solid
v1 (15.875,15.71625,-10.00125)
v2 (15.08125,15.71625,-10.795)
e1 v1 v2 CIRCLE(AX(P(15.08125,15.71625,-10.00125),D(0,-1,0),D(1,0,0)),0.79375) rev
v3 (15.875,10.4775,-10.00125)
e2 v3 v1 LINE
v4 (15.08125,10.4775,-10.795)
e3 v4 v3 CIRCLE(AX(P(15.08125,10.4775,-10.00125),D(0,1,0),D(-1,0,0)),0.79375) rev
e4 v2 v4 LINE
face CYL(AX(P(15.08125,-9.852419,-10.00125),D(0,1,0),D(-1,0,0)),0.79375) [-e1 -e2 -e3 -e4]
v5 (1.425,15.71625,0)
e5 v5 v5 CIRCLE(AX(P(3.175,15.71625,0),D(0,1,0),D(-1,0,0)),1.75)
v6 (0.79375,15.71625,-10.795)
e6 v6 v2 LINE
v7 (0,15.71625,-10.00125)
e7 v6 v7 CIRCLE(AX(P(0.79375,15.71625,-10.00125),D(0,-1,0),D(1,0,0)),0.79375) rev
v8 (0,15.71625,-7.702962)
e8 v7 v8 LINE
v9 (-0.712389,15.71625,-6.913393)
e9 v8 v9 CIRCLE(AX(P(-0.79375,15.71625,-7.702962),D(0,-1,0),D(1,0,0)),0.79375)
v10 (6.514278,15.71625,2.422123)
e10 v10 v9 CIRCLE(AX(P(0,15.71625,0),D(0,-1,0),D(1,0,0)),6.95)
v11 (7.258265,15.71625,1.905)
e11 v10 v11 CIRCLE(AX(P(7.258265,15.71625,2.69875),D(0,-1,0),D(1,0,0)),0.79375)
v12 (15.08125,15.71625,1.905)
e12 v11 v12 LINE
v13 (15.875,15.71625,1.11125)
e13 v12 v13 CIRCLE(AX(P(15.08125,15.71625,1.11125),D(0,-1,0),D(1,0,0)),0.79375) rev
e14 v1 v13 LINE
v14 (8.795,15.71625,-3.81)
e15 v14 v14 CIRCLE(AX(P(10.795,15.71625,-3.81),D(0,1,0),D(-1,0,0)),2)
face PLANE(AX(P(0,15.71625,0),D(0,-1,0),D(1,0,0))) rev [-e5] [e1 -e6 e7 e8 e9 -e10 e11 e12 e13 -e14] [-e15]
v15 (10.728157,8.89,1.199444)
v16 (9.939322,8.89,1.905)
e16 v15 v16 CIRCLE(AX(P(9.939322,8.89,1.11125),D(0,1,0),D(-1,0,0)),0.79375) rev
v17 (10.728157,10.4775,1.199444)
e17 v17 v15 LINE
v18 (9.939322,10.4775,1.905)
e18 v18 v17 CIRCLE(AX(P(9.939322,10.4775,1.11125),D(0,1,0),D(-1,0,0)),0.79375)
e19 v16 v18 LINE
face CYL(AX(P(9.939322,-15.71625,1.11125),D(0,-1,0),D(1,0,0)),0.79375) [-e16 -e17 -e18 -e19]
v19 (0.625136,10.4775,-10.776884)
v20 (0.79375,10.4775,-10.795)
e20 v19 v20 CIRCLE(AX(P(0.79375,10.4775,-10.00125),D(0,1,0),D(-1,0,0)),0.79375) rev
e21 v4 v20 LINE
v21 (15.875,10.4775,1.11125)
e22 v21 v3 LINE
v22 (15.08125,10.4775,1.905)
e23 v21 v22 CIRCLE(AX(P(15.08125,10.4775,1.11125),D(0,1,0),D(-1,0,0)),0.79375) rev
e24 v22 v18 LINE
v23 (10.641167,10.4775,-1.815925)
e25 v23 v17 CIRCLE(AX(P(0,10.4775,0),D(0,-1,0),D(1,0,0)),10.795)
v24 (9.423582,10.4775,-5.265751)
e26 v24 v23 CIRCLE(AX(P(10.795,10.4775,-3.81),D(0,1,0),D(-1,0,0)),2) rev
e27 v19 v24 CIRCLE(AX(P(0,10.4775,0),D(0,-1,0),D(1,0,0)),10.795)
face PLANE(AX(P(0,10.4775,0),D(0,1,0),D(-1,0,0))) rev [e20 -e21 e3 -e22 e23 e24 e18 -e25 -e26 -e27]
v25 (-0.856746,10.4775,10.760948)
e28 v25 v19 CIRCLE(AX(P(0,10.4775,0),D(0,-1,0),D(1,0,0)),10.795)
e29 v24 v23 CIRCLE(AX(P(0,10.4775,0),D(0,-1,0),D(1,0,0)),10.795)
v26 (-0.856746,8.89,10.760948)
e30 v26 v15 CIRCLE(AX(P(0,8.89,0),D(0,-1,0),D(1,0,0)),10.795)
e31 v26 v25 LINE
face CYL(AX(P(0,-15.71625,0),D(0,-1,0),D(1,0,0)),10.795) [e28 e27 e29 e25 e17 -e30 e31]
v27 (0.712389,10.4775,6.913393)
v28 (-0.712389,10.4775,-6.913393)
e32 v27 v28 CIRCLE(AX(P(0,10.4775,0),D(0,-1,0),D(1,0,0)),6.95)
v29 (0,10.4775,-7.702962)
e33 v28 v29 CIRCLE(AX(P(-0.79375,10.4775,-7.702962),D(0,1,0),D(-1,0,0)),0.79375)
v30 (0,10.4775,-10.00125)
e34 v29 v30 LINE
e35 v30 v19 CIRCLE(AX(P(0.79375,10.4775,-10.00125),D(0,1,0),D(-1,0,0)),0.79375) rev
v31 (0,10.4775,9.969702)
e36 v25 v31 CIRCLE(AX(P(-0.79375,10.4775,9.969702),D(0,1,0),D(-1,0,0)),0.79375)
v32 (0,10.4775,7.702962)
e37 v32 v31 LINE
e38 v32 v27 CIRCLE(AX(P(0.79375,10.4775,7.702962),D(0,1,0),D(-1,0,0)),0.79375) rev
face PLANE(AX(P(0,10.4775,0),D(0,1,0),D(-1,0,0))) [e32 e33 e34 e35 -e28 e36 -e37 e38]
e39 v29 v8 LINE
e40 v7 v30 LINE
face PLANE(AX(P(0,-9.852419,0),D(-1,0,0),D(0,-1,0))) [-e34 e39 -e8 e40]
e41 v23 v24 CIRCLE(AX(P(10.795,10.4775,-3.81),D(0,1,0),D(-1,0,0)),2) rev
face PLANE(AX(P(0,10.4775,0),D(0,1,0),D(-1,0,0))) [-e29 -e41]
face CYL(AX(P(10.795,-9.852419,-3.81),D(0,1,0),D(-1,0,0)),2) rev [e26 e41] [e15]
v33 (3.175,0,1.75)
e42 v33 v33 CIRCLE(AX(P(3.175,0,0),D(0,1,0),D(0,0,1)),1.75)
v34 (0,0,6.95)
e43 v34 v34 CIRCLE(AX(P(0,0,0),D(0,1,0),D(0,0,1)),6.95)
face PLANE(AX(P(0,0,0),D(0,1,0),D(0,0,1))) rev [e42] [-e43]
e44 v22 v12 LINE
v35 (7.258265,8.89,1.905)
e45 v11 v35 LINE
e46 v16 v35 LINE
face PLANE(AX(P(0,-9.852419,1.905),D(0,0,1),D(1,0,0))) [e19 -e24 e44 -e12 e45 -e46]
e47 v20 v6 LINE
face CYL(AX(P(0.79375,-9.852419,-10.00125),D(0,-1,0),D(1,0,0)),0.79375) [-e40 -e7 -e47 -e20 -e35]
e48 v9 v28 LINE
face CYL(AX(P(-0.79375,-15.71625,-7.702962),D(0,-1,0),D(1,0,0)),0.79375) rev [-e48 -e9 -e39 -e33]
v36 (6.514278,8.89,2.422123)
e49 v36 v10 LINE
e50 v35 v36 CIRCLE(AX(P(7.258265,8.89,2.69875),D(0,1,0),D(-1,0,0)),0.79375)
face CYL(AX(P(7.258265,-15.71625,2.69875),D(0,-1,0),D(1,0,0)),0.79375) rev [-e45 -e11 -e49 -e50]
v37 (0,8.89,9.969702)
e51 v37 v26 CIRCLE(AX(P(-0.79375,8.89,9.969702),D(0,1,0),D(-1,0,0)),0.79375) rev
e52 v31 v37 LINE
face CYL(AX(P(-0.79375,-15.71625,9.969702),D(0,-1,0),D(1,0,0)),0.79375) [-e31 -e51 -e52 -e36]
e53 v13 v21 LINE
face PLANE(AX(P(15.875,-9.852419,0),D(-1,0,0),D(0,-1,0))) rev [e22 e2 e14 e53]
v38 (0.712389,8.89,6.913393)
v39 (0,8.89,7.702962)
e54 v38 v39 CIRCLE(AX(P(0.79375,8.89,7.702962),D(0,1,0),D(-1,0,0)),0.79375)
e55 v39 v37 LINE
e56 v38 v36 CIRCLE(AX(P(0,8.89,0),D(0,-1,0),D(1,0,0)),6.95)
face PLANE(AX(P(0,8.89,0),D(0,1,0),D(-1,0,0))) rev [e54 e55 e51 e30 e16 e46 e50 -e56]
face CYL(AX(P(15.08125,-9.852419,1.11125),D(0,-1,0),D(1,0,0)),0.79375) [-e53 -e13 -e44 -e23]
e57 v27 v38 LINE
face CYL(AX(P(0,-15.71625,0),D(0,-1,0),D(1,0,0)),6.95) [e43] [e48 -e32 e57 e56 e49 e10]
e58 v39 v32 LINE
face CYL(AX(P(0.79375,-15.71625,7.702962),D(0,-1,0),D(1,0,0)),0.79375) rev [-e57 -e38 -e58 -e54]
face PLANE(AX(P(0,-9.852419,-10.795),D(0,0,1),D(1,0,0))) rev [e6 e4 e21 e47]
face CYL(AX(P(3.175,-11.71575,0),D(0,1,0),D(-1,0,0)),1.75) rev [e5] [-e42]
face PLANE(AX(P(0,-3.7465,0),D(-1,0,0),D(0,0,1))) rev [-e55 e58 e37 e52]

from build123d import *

# Parameters (mm, degrees)
SKETCH2_W           = 5.23875
SKETCH2_H           = 6.95
SKETCH2_W_2         = 1.5875
SKETCH2_H_2         = 3.845
SKETCH2_W_3         = 17.78
SKETCH3_R           = 11.338051479
CUT_EXTRUDE1_DEPTH  = 21.336
SKETCH5_R           = 1.75
CUT_EXTRUDE3_DEPTH  = 27.432
BOSS_EXTRUDE2_START = -5.23875
SKETCH5_3_R         = 2
BOSS_EXTRUDE2_DEPTH = 5.23875
FILLET1_R           = 0.79375
CUT_EXTRUDE4_START  = -14.224
CUT_EXTRUDE4_DEPTH  = 14.224
FILLET2_R           = 0.79375


with BuildPart() as part:
    # Sketch2 → Revolve2 (revolve)
    with BuildSketch(Plane(origin=(0, 0, 0), x_dir=(0, 1, 0), z_dir=(0, 0, 1)), mode=Mode.PRIVATE) as revolve2_sk:
        with Locations((-13.096875, 3.475)):
            Rectangle(SKETCH2_W, SKETCH2_H)
        with Locations((-9.68375, 3.475)):
            Rectangle(SKETCH2_W_2, SKETCH2_H)
        with Locations((-9.68375, 8.8725)):
            Rectangle(SKETCH2_W_2, SKETCH2_H_2)
        with Locations((0, 3.475)):
            Rectangle(SKETCH2_W_3, SKETCH2_H)
        with Locations((9.68375, 3.475)):
            Rectangle(SKETCH2_W_2, SKETCH2_H)
        with Locations((9.68375, 8.8725)):
            Rectangle(SKETCH2_W_2, SKETCH2_H_2)
        with Locations((13.096875, 3.475)):
            Rectangle(SKETCH2_W, SKETCH2_H)
    revolve(revolve2_sk.sketch.rotate(Axis((0, -15.71625, 0), (0, 1, 0)), 180), axis=Axis((0, -15.71625, 0), (0, 1, 0)))

    # Sketch3 → Cut-Extrude1 (cut)
    with BuildSketch(Plane(origin=(0, 0, 0), x_dir=(-1, 0, 0), z_dir=(0, 1, 0))):
        Circle(SKETCH3_R)
    extrude(amount=-CUT_EXTRUDE1_DEPTH, mode=Mode.SUBTRACT)

    # Sketch5 → Cut-Extrude3 (cut)
    with BuildSketch(Plane(origin=(0, 15.71625, 0), x_dir=(-1, 0, 0), z_dir=(0, 1, 0))):
        with Locations((-3.175, 0)):
            Circle(SKETCH5_R)
    extrude(amount=-CUT_EXTRUDE3_DEPTH, mode=Mode.SUBTRACT)

    # Sketch5<3> → Boss-Extrude2 (add)
    with BuildSketch(Plane(origin=(0, 15.71625, 0), x_dir=(-1, 0, 0), z_dir=(0, 1, 0)).offset(BOSS_EXTRUDE2_START)):
        with BuildLine():
            Line((-15.875, -10.795), (0, -10.795))
            Line((0, -10.795), (0, -6.95))
            ThreePointArc((0, -6.95), (-5.547172703, -4.187048483), (-6.683821886, 1.905))
            Line((-6.683821886, 1.905), (-15.875, 1.905))
            Line((-15.875, 1.905), (-15.875, -10.795))
        make_face()
        with Locations((-10.795, -3.81)):
            Circle(SKETCH5_3_R, mode=Mode.SUBTRACT)
    extrude(amount=BOSS_EXTRUDE2_DEPTH)

    # Fillet1
    # the kernel refuses this fillet: 0.79375 mm, written as the material it adds along each edge
    with BuildSketch(Plane(origin=(0, 10.4775, -6.95), x_dir=(-0.9986823309895368, 0, 0.051318629846335534), z_dir=(0, 1, 0))) as fillet1_piece_1:
        with BuildLine():
            CenterArc((0.754063117, -0.7927041), FILLET1_R, 92.941633047, 84.116733906)
            Line((-0.038640983, -0.751969938), (0, 0))
            ThreePointArc((0, 0), (0.356664477, -0.0091578), (0.713328955, 0))
        make_face()
    extrude(amount=5.23875)
    with BuildSketch(Plane(origin=(6.683821886, 9.041391923, 1.905), x_dir=(1, 0, 0), z_dir=(0, 1, 0))) as fillet1_piece_2:
        with BuildLine():
            CenterArc((0.574443231, -0.79375), FILLET1_R, 90, 69.603984808)
            ThreePointArc((-0.169543589, -0.51712268), (-0.079708314, -0.26022145), (0, 0))
            Line((0, 0), (0.574443231, 0))
        make_face()
    extrude(amount=6.674858077)
    # the kernel refuses this fillet: 0.79375 mm, written as the material it takes off along each edge
    with BuildSketch(Plane(origin=(0, 10.4775, -10.795), x_dir=(1, 0, 0), z_dir=(0, 1, 0))) as fillet1_2_piece_1:
        with BuildLine():
            CenterArc((FILLET1_R, -FILLET1_R), FILLET1_R, 90, 90)
            Line((0, -FILLET1_R), (0, 0))
            Line((0, 0), (FILLET1_R, 0))
        make_face()
    extrude(amount=7.223125, mode=Mode.SUBTRACT)
    with BuildSketch(Plane(origin=(15.875, 8.493125, 1.905), x_dir=(0, 0, -1), z_dir=(0, 1, 0)), Plane(origin=(15.875, 8.493125, -10.795), x_dir=(-1, 0, 0), z_dir=(0, 1, 0))) as fillet1_2_piece_2:
        with BuildLine():
            CenterArc((FILLET1_R, FILLET1_R), FILLET1_R, 180, 90)
            Line((0, FILLET1_R), (0, 0))
            Line((0, 0), (FILLET1_R, 0))
        make_face()
    extrude(amount=9.2075, mode=Mode.SUBTRACT)

    # Sketch6 → Cut-Extrude4 (cut)
    with BuildSketch(Plane(origin=(0, 10.4775, 0), x_dir=(-1, 0, 0), z_dir=(0, 1, 0)).offset(CUT_EXTRUDE4_START)):
        with BuildLine():
            ThreePointArc((-6.514278297, 2.42212268), (-3.966657748, 5.70684907), (0, 6.95))
            Line((0, 6.95), (0, 10.795))
            ThreePointArc((0, 10.795), (-6.927032193, 8.279387055), (-10.625582337, 1.905))
            Line((-10.625582337, 1.905), (-7.258265116, 1.905))
            ThreePointArc((-7.258265116, 1.905), (-6.805238557, 2.046978568), (-6.514278297, 2.42212268))
        make_face()
    extrude(amount=CUT_EXTRUDE4_DEPTH, mode=Mode.SUBTRACT)

    # Fillet2
    # the kernel refuses this fillet: 0.79375 mm, written as the material it adds along each edge
    with BuildSketch(Plane(origin=(0, 8.89, 6.95), x_dir=(0.9986823309895368, 0, -0.05131862984633391), z_dir=(0, 1, 0))) as fillet2_piece_1:
        with BuildLine():
            CenterArc((0.754063117, -0.7927041), FILLET2_R, 92.941633047, 84.116733906)
            Line((-0.038640983, -0.751969938), (0, 0))
            ThreePointArc((0, 0), (0.356664477, -0.0091578), (0.713328955, 0))
        make_face()
    extrude(amount=1.5875)
    # the kernel refuses this fillet: 0.79375 mm, written as the material it takes off along each edge
    with BuildSketch(Plane(origin=(0, 6.746443854, 10.795), x_dir=(0, 0, -1), z_dir=(0, 1, 0))) as fillet2_2_piece_1:
        with BuildLine():
            CenterArc((0.825297773, 0.79375), FILLET2_R, 175.447928579, 94.552071421)
            ThreePointArc((0.034051564, 0.856746032), (0.00851625, 0.428711229), (0, 0))
            Line((0, 0), (0.825297773, 0))
        make_face()
    extrude(amount=5.874612291, mode=Mode.SUBTRACT)
    with BuildSketch(Plane(origin=(10.625582337, 7.107567927, 1.905), x_dir=(-1, 0, 0), z_dir=(0, 1, 0))) as fillet2_2_piece_2:
        with BuildLine():
            CenterArc((0.686260177, -0.79375), FILLET2_R, 90, 83.620629792)
            ThreePointArc((-0.102574915, -0.705555556), (-0.057113988, -0.351930706), (0, 0))
            Line((0, 0), (0.686260177, 0))
        make_face()
    extrude(amount=3.369932073, mode=Mode.SUBTRACT)


solid = part.part
